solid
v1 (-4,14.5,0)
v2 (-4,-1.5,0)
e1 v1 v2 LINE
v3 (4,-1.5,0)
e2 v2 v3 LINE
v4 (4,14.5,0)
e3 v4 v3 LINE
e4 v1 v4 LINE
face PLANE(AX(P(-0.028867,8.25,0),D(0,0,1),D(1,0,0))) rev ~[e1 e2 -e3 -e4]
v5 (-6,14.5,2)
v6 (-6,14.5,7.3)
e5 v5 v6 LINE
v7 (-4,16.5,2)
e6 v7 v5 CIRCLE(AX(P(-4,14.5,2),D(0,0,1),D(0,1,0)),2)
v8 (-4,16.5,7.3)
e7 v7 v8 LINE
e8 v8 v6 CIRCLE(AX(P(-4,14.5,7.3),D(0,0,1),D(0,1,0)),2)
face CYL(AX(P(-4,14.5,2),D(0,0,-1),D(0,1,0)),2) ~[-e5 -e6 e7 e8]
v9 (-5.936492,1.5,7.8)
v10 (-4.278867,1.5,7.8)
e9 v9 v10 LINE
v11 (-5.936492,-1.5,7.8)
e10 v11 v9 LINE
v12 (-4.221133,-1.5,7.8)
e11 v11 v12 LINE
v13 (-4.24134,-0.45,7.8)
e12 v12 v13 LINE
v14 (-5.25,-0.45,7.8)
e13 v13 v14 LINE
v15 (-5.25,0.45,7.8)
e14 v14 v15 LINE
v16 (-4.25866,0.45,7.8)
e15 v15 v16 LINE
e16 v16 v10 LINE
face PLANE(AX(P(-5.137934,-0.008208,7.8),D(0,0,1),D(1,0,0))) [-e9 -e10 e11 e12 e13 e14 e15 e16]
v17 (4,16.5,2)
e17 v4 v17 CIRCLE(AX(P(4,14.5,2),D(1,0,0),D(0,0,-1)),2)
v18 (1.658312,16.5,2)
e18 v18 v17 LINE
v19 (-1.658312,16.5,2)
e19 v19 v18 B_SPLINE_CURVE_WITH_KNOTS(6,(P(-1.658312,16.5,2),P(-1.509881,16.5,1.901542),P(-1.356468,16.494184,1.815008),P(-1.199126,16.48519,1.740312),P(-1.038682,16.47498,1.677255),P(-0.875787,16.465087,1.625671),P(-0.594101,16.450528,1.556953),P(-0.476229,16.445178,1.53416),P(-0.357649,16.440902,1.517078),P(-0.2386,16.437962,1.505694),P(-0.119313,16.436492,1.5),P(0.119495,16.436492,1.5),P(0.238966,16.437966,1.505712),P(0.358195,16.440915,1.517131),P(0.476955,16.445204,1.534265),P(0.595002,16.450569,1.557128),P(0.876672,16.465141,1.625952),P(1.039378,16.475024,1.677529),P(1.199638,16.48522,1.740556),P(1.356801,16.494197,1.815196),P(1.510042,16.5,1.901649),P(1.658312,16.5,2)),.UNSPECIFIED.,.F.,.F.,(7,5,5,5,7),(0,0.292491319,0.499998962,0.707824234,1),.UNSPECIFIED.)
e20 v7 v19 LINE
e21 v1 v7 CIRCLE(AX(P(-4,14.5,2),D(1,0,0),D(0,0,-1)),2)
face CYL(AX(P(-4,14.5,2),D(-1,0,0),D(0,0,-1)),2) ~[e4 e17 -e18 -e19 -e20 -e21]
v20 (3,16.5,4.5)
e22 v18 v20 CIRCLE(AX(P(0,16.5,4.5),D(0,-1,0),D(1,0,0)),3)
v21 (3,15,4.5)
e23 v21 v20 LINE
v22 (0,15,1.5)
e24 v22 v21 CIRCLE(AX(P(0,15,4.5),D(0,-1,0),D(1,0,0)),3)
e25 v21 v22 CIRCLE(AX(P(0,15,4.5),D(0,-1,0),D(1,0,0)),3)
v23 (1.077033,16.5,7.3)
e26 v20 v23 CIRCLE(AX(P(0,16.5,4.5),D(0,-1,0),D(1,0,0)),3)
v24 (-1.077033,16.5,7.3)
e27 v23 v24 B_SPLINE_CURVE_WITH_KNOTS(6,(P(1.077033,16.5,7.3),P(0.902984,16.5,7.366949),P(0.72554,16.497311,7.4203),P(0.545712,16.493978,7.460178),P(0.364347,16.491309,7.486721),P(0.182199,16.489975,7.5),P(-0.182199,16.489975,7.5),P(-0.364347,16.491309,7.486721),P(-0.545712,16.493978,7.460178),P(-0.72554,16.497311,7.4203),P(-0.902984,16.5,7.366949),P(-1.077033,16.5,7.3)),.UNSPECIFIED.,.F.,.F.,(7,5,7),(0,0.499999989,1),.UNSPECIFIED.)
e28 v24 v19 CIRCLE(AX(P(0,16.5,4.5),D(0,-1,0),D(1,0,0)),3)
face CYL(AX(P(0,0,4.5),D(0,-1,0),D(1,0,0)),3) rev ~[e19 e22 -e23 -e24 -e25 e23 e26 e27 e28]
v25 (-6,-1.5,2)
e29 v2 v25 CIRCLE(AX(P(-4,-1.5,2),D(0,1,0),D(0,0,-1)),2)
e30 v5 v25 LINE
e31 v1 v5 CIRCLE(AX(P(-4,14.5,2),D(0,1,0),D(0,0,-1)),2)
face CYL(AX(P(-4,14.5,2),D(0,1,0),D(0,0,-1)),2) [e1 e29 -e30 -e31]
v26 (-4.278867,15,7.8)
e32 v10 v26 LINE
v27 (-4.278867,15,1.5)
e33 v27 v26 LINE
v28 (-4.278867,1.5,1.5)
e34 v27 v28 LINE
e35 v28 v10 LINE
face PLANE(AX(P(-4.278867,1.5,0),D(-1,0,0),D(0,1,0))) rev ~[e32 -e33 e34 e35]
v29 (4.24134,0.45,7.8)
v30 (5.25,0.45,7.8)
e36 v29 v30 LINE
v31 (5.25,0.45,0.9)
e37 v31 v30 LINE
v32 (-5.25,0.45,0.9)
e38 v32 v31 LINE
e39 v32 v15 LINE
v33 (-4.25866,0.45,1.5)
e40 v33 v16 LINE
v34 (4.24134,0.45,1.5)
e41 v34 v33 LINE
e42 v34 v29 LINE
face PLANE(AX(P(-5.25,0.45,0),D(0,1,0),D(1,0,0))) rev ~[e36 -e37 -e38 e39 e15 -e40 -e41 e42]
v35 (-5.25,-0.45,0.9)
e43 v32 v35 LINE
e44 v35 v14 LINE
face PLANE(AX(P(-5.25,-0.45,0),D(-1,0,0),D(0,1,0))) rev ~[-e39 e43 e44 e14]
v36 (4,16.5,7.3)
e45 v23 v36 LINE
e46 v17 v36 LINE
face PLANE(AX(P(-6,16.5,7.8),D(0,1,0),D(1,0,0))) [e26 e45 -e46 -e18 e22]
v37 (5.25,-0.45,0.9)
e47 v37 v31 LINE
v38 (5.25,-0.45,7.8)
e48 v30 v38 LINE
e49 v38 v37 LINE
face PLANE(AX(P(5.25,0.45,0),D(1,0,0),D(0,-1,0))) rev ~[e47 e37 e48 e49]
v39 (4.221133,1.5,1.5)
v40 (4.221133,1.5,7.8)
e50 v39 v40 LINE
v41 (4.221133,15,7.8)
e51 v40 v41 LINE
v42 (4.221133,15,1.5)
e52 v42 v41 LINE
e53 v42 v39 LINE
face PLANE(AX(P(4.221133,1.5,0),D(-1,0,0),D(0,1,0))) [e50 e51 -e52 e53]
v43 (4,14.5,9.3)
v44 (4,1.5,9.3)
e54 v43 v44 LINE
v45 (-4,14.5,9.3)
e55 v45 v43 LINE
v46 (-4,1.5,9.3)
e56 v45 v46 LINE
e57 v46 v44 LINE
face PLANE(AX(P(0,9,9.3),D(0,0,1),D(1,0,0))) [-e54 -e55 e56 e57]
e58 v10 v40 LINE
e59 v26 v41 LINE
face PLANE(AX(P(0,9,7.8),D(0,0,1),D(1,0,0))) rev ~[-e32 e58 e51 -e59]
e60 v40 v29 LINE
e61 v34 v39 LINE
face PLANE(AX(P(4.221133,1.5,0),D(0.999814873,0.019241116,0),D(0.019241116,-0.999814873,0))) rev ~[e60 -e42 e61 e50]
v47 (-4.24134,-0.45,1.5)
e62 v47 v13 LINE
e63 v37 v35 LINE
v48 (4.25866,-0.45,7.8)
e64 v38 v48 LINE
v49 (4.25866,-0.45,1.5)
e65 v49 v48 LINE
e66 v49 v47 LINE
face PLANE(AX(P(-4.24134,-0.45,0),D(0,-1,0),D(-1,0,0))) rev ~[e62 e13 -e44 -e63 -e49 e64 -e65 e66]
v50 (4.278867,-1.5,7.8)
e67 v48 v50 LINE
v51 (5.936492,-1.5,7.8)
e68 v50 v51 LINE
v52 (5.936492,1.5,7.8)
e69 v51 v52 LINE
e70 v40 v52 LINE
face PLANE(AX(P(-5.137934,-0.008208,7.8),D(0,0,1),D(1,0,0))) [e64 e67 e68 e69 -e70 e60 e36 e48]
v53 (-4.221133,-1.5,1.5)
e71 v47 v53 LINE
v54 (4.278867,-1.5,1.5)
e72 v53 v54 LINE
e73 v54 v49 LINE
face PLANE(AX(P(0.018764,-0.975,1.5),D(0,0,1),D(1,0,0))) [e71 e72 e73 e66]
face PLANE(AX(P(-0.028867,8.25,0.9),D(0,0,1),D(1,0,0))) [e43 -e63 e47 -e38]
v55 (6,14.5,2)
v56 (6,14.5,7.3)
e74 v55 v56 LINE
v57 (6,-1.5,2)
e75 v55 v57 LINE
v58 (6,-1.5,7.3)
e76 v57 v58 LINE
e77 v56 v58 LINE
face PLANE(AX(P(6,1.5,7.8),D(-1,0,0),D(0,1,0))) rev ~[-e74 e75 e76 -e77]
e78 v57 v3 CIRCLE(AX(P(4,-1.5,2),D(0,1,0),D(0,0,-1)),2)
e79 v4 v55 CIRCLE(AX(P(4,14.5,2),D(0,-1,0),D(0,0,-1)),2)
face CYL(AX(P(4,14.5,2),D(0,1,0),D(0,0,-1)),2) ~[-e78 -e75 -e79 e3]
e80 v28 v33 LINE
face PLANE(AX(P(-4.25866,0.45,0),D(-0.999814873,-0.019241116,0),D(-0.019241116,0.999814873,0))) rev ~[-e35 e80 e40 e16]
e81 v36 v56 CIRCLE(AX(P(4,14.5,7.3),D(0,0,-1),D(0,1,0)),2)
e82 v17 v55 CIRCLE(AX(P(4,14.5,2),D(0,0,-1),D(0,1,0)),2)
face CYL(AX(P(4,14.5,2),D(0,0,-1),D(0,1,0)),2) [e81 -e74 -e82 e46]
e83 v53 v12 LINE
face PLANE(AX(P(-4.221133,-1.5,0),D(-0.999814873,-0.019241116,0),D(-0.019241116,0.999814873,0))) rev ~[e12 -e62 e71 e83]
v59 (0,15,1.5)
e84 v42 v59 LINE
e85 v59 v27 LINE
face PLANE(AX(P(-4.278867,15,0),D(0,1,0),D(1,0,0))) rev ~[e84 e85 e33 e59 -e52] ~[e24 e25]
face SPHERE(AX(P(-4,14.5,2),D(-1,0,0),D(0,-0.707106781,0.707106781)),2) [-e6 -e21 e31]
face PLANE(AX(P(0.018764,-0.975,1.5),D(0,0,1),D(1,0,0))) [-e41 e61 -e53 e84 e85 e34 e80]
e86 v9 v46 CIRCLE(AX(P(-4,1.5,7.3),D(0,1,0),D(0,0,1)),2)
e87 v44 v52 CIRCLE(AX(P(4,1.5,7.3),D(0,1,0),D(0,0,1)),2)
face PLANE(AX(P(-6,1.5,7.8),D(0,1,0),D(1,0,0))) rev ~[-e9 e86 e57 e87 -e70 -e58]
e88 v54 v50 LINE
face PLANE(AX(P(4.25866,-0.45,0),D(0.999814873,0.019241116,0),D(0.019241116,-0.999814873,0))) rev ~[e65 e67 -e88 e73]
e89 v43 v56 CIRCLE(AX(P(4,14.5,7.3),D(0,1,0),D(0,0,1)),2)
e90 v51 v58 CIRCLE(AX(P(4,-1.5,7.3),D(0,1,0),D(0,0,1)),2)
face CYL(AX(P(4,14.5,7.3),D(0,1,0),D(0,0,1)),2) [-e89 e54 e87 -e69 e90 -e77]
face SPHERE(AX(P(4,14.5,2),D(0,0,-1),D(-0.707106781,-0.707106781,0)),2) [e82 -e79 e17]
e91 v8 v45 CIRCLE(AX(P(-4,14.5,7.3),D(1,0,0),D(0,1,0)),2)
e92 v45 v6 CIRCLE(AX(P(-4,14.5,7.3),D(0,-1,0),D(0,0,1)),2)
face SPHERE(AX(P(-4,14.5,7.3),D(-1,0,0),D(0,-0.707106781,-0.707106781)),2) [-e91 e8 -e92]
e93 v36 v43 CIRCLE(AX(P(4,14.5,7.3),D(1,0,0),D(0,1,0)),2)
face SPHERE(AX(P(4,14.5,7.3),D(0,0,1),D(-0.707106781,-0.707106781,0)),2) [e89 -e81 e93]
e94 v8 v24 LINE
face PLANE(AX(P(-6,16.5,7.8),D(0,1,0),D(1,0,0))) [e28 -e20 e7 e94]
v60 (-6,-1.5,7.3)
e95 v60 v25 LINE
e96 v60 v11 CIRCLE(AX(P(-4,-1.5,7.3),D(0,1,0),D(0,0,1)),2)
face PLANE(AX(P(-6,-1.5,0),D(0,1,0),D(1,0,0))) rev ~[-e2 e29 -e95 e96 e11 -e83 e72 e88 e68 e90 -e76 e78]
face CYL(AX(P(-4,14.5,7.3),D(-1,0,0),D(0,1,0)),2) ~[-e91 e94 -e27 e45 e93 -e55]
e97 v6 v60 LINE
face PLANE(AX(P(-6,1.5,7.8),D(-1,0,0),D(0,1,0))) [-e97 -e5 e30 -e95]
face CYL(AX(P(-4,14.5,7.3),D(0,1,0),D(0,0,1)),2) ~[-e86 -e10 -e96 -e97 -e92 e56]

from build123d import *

# Parameters (mm, degrees)
F0_W         = 8.5
F0_H         = 13.5
F0_W_2       = 1.7211329822
F0_H_2       = 1.5
F0_W_3       = 1.7788670178
F1_DEPTH     = 0.9
F2_DEPTH     = 1.5
F3_DEPTH     = 7.8
F5_W         = 12
F5_H         = 15
F6_DEPTH     = 1.5
F7_R         = 3
F8_DEPTH     = 16.501
F9_T1_DEPTH  = 5.3
F9_T3_DEPTH  = 8
F9_T5_DEPTH  = 18
F9_T7_DEPTH  = 21
F9_S11_W     = 2
F9_S11_H     = 2
F9_T12_DEPTH = 2
F9_S17_W     = 2
F9_S17_H     = 2
F9_T18_DEPTH = 2
F9_S23_W     = 2
F9_S23_H     = 2
F9_T24_DEPTH = 2
F9_S29_W     = 2
F9_S29_H     = 2
F9_T30_DEPTH = 2


# Not quite as in the source:
# - a fillet or chamfer that OpenCascade refuses, or shapes differently, is made with other operations: its cross-section is extruded or revolved along the edge and cut away or added
# - a feature names something its author has since deleted; it is built from what else it names


with BuildPart() as f1:
    # F0 (on Top) → F1 (new body)
    with BuildSketch(Plane.XY):
        with Locations((-0.0288670178, 8.25)):
            Rectangle(F0_W, F0_H)
        Polygon((-6, 1.5), (-6, -1.5), (-4.2211329822, -1.5), (-4.2413398946, -0.45), (-5.25, -0.45), (-5.25, 0.45), (-4.2586601054, 0.45), (-4.2788670178, 1.5), align=None)
        Polygon((4.2211329822, 1.5), (-4.2788670178, 1.5), (-4.2586601054, 0.45), (4.2413398946, 0.45), align=None)
        with Locations((-5.1394335089, 8.25)):
            Rectangle(F0_W_2, F0_H)
        Polygon((4.2586601054, -0.45), (4.2788670178, -1.5), (6, -1.5), (6, 1.5), (4.2211329822, 1.5), (4.2413398946, 0.45), (5.25, 0.45), (5.25, -0.45), align=None)
        Polygon((-4.2413398946, -0.45), (-4.2211329822, -1.5), (4.2788670178, -1.5), (4.2586601054, -0.45), align=None)
        Polygon((-4.2586601054, 0.45), (-4.2413398946, -0.45), (4.2586601054, -0.45), (4.2413398946, 0.45), align=None)
        Polygon((-5.25, -0.45), (-4.2413398946, -0.45), (-4.2586601054, 0.45), (-5.25, 0.45), align=None)
        Polygon((4.2413398946, 0.45), (4.2586601054, -0.45), (5.25, -0.45), (5.25, 0.45), align=None)
        with Locations((-5.1394335089, 15.75)):
            Rectangle(F0_W_2, F0_H_2)
        with Locations((-0.0288670178, 15.75)):
            Rectangle(F0_W, F0_H_2)
        with Locations((5.1105664911, 15.75)):
            Rectangle(F0_W_3, F0_H_2)
        with Locations((5.1105664911, 8.25)):
            Rectangle(F0_W_3, F0_H)
    extrude(amount=F1_DEPTH)

    # F0 (on Top) → F2 (join)
    with BuildSketch(Plane.XY):
        Polygon((-4.2413398946, -0.45), (-4.2211329822, -1.5), (4.2788670178, -1.5), (4.2586601054, -0.45), align=None)
        Polygon((-6, 1.5), (-6, -1.5), (-4.2211329822, -1.5), (-4.2413398946, -0.45), (-5.25, -0.45), (-5.25, 0.45), (-4.2586601054, 0.45), (-4.2788670178, 1.5), align=None)
        Polygon((4.2586601054, -0.45), (4.2788670178, -1.5), (6, -1.5), (6, 1.5), (4.2211329822, 1.5), (4.2413398946, 0.45), (5.25, 0.45), (5.25, -0.45), align=None)
        Polygon((4.2211329822, 1.5), (-4.2788670178, 1.5), (-4.2586601054, 0.45), (4.2413398946, 0.45), align=None)
        with Locations((-5.1394335089, 8.25)):
            Rectangle(F0_W_2, F0_H)
        with Locations((5.1105664911, 8.25)):
            Rectangle(F0_W_3, F0_H)
        with Locations((-0.0288670178, 8.25)):
            Rectangle(F0_W, F0_H)
        with Locations((-5.1394335089, 15.75)):
            Rectangle(F0_W_2, F0_H_2)
        with Locations((-0.0288670178, 15.75)):
            Rectangle(F0_W, F0_H_2)
        with Locations((5.1105664911, 15.75)):
            Rectangle(F0_W_3, F0_H_2)
    extrude(amount=F2_DEPTH)

    # F0 (on Top) → F3 (join)
    with BuildSketch(Plane.XY):
        Polygon((-6, 1.5), (-6, -1.5), (-4.2211329822, -1.5), (-4.2413398946, -0.45), (-5.25, -0.45), (-5.25, 0.45), (-4.2586601054, 0.45), (-4.2788670178, 1.5), align=None)
        Polygon((4.2586601054, -0.45), (4.2788670178, -1.5), (6, -1.5), (6, 1.5), (4.2211329822, 1.5), (4.2413398946, 0.45), (5.25, 0.45), (5.25, -0.45), align=None)
        with Locations((-5.1394335089, 8.25)):
            Rectangle(F0_W_2, F0_H)
        with Locations((5.1105664911, 8.25)):
            Rectangle(F0_W_3, F0_H)
        with Locations((-5.1394335089, 15.75)):
            Rectangle(F0_W_2, F0_H_2)
        with Locations((-0.0288670178, 15.75)):
            Rectangle(F0_W, F0_H_2)
        with Locations((5.1105664911, 15.75)):
            Rectangle(F0_W_3, F0_H_2)
    extrude(amount=F3_DEPTH)

    # F5 (on offset) → F6 (join)
    with BuildSketch(Plane.XY.offset(7.8)):
        with Locations((0, 9)):
            Rectangle(F5_W, F5_H)
    extrude(amount=F6_DEPTH)

    # F7 (on Front) → F8 (cut, through all)
    with BuildSketch(Plane.XZ):
        with Locations((0, 4.5)):
            Circle(F7_R)
    extrude(amount=-F8_DEPTH, mode=Mode.SUBTRACT)

    # F9: fillet of radius 2 on 8 edges, made by hand

    # F9_s2 → F9_t1 (cut)
    with BuildSketch(Plane.XY.offset(2)):
        with BuildLine():
            ThreePointArc((4, 16.5), (5.4142135624, 15.9142135624), (6, 14.5))
            Line((6, 14.5), (6, 16.5))
            Line((6, 16.5), (4, 16.5))
        make_face()
        with BuildLine():
            ThreePointArc((-4, 16.5), (-5.4142135624, 15.9142135624), (-6, 14.5))
            Line((-6, 14.5), (-6, 16.5))
            Line((-6, 16.5), (-4, 16.5))
        make_face()
    extrude(amount=F9_T1_DEPTH, mode=Mode.SUBTRACT)

    # F9_s4 → F9_t3 (cut)
    with BuildSketch(Plane.YZ.offset(-4)):
        with BuildLine():
            ThreePointArc((16.5, 7.3), (15.9142135624, 8.7142135624), (14.5, 9.3))
            Line((14.5, 9.3), (16.5, 9.3))
            Line((16.5, 9.3), (16.5, 7.3))
        make_face()
        with BuildLine():
            ThreePointArc((14.5, 0), (15.9142135624, 0.5857864376), (16.5, 2))
            Line((16.5, 2), (16.5, 0))
            Line((16.5, 0), (14.5, 0))
        make_face()
    extrude(amount=F9_T3_DEPTH, mode=Mode.SUBTRACT)

    # F9_s6 → F9_t5 (cut)
    with BuildSketch(Plane.XZ.offset(-14.5)):
        with BuildLine():
            ThreePointArc((4, 9.3), (5.4142135624, 8.7142135624), (6, 7.3))
            Line((6, 7.3), (6, 9.3))
            Line((6, 9.3), (4, 9.3))
        make_face()
        with BuildLine():
            ThreePointArc((-4, 9.3), (-5.4142135624, 8.7142135624), (-6, 7.3))
            Line((-6, 7.3), (-6, 9.3))
            Line((-6, 9.3), (-4, 9.3))
        make_face()
    extrude(amount=F9_T5_DEPTH, mode=Mode.SUBTRACT)

    # F9_s8 → F9_t7 (cut)
    with BuildSketch(Plane.XZ.offset(-14.5)):
        with BuildLine():
            ThreePointArc((4, 0), (5.4142135624, 0.5857864376), (6, 2))
            Line((6, 2), (6, 0))
            Line((6, 0), (4, 0))
        make_face()
        with BuildLine():
            ThreePointArc((-4, 0), (-5.4142135624, 0.5857864376), (-6, 2))
            Line((-6, 2), (-6, 0))
            Line((-6, 0), (-4, 0))
        make_face()
    extrude(amount=F9_T7_DEPTH, mode=Mode.SUBTRACT)


with BuildPart() as f9_tool10:
    # F9_s11 → F9_t12 (new body)
    with BuildSketch(Plane.XY.offset(2)):
        with Locations((5, 15.5)):
            Rectangle(F9_S11_W, F9_S11_H)
    extrude(amount=-F9_T12_DEPTH)

    # F9_s13 → F9_t14 (revolve, cut)
    with BuildSketch(Plane(origin=(4, 14.5, 2), x_dir=(-0.7071067812, -0.7071067812, 0), z_dir=(0.7071067812, -0.7071067812, 0))):
        with BuildLine():
            ThreePointArc((0, -2), (2, 0), (0, 2))
            Line((0, 2), (0, -2))
        make_face()
    revolve(axis=Axis((4, 14.5, 2), (0, 0, -1)), mode=Mode.SUBTRACT)


with BuildPart() as f1_1:
    add(f1.part)

    # F9_t9: cut F9_tool10
    add(f9_tool10.part, mode=Mode.SUBTRACT)


with BuildPart() as f9_tool16:
    # F9_s17 → F9_t18 (new body)
    with BuildSketch(Plane.XY.offset(7.3)):
        with Locations((5, 15.5)):
            Rectangle(F9_S17_W, F9_S17_H)
    extrude(amount=F9_T18_DEPTH)

    # F9_s19 → F9_t20 (revolve, cut)
    with BuildSketch(Plane(origin=(4, 14.5, 7.3), x_dir=(-0.7071067812, -0.7071067812, 0), z_dir=(-0.7071067812, 0.7071067812, 0))):
        with BuildLine():
            ThreePointArc((0, -2), (2, 0), (0, 2))
            Line((0, 2), (0, -2))
        make_face()
    revolve(axis=Axis((4, 14.5, 7.3), (0, 0, 1)), mode=Mode.SUBTRACT)


with BuildPart() as f1_2:
    add(f1_1.part)

    # F9_t15: cut F9_tool16
    add(f9_tool16.part, mode=Mode.SUBTRACT)


with BuildPart() as f9_tool22:
    # F9_s23 → F9_t24 (new body)
    with BuildSketch(Plane.YZ.offset(-4)):
        with Locations((15.5, 8.3)):
            Rectangle(F9_S23_W, F9_S23_H)
    extrude(amount=-F9_T24_DEPTH)

    # F9_s25 → F9_t26 (revolve, cut)
    with BuildSketch(Plane(origin=(-4, 14.5, 7.3), x_dir=(0, -0.7071067812, -0.7071067812), z_dir=(0, 0.7071067812, -0.7071067812))):
        with BuildLine():
            ThreePointArc((0, -2), (2, 0), (0, 2))
            Line((0, 2), (0, -2))
        make_face()
    revolve(axis=Axis((-4, 14.5, 7.3), (-1, 0, 0)), mode=Mode.SUBTRACT)


with BuildPart() as f1_3:
    add(f1_2.part)

    # F9_t21: cut F9_tool22
    add(f9_tool22.part, mode=Mode.SUBTRACT)


with BuildPart() as f9_tool28:
    # F9_s29 → F9_t30 (new body)
    with BuildSketch(Plane.YZ.offset(-4)):
        with Locations((15.5, 1)):
            Rectangle(F9_S29_W, F9_S29_H)
    extrude(amount=-F9_T30_DEPTH)

    # F9_s31 → F9_t32 (revolve, cut)
    with BuildSketch(Plane(origin=(-4, 14.5, 2), x_dir=(0, -0.7071067812, 0.7071067812), z_dir=(0, -0.7071067812, -0.7071067812))):
        with BuildLine():
            ThreePointArc((0, -2), (2, 0), (0, 2))
            Line((0, 2), (0, -2))
        make_face()
    revolve(axis=Axis((-4, 14.5, 2), (-1, 0, 0)), mode=Mode.SUBTRACT)


with BuildPart() as f1_4:
    add(f1_3.part)

    # F9_t27: cut F9_tool28
    add(f9_tool28.part, mode=Mode.SUBTRACT)


solid = f1_4.part
